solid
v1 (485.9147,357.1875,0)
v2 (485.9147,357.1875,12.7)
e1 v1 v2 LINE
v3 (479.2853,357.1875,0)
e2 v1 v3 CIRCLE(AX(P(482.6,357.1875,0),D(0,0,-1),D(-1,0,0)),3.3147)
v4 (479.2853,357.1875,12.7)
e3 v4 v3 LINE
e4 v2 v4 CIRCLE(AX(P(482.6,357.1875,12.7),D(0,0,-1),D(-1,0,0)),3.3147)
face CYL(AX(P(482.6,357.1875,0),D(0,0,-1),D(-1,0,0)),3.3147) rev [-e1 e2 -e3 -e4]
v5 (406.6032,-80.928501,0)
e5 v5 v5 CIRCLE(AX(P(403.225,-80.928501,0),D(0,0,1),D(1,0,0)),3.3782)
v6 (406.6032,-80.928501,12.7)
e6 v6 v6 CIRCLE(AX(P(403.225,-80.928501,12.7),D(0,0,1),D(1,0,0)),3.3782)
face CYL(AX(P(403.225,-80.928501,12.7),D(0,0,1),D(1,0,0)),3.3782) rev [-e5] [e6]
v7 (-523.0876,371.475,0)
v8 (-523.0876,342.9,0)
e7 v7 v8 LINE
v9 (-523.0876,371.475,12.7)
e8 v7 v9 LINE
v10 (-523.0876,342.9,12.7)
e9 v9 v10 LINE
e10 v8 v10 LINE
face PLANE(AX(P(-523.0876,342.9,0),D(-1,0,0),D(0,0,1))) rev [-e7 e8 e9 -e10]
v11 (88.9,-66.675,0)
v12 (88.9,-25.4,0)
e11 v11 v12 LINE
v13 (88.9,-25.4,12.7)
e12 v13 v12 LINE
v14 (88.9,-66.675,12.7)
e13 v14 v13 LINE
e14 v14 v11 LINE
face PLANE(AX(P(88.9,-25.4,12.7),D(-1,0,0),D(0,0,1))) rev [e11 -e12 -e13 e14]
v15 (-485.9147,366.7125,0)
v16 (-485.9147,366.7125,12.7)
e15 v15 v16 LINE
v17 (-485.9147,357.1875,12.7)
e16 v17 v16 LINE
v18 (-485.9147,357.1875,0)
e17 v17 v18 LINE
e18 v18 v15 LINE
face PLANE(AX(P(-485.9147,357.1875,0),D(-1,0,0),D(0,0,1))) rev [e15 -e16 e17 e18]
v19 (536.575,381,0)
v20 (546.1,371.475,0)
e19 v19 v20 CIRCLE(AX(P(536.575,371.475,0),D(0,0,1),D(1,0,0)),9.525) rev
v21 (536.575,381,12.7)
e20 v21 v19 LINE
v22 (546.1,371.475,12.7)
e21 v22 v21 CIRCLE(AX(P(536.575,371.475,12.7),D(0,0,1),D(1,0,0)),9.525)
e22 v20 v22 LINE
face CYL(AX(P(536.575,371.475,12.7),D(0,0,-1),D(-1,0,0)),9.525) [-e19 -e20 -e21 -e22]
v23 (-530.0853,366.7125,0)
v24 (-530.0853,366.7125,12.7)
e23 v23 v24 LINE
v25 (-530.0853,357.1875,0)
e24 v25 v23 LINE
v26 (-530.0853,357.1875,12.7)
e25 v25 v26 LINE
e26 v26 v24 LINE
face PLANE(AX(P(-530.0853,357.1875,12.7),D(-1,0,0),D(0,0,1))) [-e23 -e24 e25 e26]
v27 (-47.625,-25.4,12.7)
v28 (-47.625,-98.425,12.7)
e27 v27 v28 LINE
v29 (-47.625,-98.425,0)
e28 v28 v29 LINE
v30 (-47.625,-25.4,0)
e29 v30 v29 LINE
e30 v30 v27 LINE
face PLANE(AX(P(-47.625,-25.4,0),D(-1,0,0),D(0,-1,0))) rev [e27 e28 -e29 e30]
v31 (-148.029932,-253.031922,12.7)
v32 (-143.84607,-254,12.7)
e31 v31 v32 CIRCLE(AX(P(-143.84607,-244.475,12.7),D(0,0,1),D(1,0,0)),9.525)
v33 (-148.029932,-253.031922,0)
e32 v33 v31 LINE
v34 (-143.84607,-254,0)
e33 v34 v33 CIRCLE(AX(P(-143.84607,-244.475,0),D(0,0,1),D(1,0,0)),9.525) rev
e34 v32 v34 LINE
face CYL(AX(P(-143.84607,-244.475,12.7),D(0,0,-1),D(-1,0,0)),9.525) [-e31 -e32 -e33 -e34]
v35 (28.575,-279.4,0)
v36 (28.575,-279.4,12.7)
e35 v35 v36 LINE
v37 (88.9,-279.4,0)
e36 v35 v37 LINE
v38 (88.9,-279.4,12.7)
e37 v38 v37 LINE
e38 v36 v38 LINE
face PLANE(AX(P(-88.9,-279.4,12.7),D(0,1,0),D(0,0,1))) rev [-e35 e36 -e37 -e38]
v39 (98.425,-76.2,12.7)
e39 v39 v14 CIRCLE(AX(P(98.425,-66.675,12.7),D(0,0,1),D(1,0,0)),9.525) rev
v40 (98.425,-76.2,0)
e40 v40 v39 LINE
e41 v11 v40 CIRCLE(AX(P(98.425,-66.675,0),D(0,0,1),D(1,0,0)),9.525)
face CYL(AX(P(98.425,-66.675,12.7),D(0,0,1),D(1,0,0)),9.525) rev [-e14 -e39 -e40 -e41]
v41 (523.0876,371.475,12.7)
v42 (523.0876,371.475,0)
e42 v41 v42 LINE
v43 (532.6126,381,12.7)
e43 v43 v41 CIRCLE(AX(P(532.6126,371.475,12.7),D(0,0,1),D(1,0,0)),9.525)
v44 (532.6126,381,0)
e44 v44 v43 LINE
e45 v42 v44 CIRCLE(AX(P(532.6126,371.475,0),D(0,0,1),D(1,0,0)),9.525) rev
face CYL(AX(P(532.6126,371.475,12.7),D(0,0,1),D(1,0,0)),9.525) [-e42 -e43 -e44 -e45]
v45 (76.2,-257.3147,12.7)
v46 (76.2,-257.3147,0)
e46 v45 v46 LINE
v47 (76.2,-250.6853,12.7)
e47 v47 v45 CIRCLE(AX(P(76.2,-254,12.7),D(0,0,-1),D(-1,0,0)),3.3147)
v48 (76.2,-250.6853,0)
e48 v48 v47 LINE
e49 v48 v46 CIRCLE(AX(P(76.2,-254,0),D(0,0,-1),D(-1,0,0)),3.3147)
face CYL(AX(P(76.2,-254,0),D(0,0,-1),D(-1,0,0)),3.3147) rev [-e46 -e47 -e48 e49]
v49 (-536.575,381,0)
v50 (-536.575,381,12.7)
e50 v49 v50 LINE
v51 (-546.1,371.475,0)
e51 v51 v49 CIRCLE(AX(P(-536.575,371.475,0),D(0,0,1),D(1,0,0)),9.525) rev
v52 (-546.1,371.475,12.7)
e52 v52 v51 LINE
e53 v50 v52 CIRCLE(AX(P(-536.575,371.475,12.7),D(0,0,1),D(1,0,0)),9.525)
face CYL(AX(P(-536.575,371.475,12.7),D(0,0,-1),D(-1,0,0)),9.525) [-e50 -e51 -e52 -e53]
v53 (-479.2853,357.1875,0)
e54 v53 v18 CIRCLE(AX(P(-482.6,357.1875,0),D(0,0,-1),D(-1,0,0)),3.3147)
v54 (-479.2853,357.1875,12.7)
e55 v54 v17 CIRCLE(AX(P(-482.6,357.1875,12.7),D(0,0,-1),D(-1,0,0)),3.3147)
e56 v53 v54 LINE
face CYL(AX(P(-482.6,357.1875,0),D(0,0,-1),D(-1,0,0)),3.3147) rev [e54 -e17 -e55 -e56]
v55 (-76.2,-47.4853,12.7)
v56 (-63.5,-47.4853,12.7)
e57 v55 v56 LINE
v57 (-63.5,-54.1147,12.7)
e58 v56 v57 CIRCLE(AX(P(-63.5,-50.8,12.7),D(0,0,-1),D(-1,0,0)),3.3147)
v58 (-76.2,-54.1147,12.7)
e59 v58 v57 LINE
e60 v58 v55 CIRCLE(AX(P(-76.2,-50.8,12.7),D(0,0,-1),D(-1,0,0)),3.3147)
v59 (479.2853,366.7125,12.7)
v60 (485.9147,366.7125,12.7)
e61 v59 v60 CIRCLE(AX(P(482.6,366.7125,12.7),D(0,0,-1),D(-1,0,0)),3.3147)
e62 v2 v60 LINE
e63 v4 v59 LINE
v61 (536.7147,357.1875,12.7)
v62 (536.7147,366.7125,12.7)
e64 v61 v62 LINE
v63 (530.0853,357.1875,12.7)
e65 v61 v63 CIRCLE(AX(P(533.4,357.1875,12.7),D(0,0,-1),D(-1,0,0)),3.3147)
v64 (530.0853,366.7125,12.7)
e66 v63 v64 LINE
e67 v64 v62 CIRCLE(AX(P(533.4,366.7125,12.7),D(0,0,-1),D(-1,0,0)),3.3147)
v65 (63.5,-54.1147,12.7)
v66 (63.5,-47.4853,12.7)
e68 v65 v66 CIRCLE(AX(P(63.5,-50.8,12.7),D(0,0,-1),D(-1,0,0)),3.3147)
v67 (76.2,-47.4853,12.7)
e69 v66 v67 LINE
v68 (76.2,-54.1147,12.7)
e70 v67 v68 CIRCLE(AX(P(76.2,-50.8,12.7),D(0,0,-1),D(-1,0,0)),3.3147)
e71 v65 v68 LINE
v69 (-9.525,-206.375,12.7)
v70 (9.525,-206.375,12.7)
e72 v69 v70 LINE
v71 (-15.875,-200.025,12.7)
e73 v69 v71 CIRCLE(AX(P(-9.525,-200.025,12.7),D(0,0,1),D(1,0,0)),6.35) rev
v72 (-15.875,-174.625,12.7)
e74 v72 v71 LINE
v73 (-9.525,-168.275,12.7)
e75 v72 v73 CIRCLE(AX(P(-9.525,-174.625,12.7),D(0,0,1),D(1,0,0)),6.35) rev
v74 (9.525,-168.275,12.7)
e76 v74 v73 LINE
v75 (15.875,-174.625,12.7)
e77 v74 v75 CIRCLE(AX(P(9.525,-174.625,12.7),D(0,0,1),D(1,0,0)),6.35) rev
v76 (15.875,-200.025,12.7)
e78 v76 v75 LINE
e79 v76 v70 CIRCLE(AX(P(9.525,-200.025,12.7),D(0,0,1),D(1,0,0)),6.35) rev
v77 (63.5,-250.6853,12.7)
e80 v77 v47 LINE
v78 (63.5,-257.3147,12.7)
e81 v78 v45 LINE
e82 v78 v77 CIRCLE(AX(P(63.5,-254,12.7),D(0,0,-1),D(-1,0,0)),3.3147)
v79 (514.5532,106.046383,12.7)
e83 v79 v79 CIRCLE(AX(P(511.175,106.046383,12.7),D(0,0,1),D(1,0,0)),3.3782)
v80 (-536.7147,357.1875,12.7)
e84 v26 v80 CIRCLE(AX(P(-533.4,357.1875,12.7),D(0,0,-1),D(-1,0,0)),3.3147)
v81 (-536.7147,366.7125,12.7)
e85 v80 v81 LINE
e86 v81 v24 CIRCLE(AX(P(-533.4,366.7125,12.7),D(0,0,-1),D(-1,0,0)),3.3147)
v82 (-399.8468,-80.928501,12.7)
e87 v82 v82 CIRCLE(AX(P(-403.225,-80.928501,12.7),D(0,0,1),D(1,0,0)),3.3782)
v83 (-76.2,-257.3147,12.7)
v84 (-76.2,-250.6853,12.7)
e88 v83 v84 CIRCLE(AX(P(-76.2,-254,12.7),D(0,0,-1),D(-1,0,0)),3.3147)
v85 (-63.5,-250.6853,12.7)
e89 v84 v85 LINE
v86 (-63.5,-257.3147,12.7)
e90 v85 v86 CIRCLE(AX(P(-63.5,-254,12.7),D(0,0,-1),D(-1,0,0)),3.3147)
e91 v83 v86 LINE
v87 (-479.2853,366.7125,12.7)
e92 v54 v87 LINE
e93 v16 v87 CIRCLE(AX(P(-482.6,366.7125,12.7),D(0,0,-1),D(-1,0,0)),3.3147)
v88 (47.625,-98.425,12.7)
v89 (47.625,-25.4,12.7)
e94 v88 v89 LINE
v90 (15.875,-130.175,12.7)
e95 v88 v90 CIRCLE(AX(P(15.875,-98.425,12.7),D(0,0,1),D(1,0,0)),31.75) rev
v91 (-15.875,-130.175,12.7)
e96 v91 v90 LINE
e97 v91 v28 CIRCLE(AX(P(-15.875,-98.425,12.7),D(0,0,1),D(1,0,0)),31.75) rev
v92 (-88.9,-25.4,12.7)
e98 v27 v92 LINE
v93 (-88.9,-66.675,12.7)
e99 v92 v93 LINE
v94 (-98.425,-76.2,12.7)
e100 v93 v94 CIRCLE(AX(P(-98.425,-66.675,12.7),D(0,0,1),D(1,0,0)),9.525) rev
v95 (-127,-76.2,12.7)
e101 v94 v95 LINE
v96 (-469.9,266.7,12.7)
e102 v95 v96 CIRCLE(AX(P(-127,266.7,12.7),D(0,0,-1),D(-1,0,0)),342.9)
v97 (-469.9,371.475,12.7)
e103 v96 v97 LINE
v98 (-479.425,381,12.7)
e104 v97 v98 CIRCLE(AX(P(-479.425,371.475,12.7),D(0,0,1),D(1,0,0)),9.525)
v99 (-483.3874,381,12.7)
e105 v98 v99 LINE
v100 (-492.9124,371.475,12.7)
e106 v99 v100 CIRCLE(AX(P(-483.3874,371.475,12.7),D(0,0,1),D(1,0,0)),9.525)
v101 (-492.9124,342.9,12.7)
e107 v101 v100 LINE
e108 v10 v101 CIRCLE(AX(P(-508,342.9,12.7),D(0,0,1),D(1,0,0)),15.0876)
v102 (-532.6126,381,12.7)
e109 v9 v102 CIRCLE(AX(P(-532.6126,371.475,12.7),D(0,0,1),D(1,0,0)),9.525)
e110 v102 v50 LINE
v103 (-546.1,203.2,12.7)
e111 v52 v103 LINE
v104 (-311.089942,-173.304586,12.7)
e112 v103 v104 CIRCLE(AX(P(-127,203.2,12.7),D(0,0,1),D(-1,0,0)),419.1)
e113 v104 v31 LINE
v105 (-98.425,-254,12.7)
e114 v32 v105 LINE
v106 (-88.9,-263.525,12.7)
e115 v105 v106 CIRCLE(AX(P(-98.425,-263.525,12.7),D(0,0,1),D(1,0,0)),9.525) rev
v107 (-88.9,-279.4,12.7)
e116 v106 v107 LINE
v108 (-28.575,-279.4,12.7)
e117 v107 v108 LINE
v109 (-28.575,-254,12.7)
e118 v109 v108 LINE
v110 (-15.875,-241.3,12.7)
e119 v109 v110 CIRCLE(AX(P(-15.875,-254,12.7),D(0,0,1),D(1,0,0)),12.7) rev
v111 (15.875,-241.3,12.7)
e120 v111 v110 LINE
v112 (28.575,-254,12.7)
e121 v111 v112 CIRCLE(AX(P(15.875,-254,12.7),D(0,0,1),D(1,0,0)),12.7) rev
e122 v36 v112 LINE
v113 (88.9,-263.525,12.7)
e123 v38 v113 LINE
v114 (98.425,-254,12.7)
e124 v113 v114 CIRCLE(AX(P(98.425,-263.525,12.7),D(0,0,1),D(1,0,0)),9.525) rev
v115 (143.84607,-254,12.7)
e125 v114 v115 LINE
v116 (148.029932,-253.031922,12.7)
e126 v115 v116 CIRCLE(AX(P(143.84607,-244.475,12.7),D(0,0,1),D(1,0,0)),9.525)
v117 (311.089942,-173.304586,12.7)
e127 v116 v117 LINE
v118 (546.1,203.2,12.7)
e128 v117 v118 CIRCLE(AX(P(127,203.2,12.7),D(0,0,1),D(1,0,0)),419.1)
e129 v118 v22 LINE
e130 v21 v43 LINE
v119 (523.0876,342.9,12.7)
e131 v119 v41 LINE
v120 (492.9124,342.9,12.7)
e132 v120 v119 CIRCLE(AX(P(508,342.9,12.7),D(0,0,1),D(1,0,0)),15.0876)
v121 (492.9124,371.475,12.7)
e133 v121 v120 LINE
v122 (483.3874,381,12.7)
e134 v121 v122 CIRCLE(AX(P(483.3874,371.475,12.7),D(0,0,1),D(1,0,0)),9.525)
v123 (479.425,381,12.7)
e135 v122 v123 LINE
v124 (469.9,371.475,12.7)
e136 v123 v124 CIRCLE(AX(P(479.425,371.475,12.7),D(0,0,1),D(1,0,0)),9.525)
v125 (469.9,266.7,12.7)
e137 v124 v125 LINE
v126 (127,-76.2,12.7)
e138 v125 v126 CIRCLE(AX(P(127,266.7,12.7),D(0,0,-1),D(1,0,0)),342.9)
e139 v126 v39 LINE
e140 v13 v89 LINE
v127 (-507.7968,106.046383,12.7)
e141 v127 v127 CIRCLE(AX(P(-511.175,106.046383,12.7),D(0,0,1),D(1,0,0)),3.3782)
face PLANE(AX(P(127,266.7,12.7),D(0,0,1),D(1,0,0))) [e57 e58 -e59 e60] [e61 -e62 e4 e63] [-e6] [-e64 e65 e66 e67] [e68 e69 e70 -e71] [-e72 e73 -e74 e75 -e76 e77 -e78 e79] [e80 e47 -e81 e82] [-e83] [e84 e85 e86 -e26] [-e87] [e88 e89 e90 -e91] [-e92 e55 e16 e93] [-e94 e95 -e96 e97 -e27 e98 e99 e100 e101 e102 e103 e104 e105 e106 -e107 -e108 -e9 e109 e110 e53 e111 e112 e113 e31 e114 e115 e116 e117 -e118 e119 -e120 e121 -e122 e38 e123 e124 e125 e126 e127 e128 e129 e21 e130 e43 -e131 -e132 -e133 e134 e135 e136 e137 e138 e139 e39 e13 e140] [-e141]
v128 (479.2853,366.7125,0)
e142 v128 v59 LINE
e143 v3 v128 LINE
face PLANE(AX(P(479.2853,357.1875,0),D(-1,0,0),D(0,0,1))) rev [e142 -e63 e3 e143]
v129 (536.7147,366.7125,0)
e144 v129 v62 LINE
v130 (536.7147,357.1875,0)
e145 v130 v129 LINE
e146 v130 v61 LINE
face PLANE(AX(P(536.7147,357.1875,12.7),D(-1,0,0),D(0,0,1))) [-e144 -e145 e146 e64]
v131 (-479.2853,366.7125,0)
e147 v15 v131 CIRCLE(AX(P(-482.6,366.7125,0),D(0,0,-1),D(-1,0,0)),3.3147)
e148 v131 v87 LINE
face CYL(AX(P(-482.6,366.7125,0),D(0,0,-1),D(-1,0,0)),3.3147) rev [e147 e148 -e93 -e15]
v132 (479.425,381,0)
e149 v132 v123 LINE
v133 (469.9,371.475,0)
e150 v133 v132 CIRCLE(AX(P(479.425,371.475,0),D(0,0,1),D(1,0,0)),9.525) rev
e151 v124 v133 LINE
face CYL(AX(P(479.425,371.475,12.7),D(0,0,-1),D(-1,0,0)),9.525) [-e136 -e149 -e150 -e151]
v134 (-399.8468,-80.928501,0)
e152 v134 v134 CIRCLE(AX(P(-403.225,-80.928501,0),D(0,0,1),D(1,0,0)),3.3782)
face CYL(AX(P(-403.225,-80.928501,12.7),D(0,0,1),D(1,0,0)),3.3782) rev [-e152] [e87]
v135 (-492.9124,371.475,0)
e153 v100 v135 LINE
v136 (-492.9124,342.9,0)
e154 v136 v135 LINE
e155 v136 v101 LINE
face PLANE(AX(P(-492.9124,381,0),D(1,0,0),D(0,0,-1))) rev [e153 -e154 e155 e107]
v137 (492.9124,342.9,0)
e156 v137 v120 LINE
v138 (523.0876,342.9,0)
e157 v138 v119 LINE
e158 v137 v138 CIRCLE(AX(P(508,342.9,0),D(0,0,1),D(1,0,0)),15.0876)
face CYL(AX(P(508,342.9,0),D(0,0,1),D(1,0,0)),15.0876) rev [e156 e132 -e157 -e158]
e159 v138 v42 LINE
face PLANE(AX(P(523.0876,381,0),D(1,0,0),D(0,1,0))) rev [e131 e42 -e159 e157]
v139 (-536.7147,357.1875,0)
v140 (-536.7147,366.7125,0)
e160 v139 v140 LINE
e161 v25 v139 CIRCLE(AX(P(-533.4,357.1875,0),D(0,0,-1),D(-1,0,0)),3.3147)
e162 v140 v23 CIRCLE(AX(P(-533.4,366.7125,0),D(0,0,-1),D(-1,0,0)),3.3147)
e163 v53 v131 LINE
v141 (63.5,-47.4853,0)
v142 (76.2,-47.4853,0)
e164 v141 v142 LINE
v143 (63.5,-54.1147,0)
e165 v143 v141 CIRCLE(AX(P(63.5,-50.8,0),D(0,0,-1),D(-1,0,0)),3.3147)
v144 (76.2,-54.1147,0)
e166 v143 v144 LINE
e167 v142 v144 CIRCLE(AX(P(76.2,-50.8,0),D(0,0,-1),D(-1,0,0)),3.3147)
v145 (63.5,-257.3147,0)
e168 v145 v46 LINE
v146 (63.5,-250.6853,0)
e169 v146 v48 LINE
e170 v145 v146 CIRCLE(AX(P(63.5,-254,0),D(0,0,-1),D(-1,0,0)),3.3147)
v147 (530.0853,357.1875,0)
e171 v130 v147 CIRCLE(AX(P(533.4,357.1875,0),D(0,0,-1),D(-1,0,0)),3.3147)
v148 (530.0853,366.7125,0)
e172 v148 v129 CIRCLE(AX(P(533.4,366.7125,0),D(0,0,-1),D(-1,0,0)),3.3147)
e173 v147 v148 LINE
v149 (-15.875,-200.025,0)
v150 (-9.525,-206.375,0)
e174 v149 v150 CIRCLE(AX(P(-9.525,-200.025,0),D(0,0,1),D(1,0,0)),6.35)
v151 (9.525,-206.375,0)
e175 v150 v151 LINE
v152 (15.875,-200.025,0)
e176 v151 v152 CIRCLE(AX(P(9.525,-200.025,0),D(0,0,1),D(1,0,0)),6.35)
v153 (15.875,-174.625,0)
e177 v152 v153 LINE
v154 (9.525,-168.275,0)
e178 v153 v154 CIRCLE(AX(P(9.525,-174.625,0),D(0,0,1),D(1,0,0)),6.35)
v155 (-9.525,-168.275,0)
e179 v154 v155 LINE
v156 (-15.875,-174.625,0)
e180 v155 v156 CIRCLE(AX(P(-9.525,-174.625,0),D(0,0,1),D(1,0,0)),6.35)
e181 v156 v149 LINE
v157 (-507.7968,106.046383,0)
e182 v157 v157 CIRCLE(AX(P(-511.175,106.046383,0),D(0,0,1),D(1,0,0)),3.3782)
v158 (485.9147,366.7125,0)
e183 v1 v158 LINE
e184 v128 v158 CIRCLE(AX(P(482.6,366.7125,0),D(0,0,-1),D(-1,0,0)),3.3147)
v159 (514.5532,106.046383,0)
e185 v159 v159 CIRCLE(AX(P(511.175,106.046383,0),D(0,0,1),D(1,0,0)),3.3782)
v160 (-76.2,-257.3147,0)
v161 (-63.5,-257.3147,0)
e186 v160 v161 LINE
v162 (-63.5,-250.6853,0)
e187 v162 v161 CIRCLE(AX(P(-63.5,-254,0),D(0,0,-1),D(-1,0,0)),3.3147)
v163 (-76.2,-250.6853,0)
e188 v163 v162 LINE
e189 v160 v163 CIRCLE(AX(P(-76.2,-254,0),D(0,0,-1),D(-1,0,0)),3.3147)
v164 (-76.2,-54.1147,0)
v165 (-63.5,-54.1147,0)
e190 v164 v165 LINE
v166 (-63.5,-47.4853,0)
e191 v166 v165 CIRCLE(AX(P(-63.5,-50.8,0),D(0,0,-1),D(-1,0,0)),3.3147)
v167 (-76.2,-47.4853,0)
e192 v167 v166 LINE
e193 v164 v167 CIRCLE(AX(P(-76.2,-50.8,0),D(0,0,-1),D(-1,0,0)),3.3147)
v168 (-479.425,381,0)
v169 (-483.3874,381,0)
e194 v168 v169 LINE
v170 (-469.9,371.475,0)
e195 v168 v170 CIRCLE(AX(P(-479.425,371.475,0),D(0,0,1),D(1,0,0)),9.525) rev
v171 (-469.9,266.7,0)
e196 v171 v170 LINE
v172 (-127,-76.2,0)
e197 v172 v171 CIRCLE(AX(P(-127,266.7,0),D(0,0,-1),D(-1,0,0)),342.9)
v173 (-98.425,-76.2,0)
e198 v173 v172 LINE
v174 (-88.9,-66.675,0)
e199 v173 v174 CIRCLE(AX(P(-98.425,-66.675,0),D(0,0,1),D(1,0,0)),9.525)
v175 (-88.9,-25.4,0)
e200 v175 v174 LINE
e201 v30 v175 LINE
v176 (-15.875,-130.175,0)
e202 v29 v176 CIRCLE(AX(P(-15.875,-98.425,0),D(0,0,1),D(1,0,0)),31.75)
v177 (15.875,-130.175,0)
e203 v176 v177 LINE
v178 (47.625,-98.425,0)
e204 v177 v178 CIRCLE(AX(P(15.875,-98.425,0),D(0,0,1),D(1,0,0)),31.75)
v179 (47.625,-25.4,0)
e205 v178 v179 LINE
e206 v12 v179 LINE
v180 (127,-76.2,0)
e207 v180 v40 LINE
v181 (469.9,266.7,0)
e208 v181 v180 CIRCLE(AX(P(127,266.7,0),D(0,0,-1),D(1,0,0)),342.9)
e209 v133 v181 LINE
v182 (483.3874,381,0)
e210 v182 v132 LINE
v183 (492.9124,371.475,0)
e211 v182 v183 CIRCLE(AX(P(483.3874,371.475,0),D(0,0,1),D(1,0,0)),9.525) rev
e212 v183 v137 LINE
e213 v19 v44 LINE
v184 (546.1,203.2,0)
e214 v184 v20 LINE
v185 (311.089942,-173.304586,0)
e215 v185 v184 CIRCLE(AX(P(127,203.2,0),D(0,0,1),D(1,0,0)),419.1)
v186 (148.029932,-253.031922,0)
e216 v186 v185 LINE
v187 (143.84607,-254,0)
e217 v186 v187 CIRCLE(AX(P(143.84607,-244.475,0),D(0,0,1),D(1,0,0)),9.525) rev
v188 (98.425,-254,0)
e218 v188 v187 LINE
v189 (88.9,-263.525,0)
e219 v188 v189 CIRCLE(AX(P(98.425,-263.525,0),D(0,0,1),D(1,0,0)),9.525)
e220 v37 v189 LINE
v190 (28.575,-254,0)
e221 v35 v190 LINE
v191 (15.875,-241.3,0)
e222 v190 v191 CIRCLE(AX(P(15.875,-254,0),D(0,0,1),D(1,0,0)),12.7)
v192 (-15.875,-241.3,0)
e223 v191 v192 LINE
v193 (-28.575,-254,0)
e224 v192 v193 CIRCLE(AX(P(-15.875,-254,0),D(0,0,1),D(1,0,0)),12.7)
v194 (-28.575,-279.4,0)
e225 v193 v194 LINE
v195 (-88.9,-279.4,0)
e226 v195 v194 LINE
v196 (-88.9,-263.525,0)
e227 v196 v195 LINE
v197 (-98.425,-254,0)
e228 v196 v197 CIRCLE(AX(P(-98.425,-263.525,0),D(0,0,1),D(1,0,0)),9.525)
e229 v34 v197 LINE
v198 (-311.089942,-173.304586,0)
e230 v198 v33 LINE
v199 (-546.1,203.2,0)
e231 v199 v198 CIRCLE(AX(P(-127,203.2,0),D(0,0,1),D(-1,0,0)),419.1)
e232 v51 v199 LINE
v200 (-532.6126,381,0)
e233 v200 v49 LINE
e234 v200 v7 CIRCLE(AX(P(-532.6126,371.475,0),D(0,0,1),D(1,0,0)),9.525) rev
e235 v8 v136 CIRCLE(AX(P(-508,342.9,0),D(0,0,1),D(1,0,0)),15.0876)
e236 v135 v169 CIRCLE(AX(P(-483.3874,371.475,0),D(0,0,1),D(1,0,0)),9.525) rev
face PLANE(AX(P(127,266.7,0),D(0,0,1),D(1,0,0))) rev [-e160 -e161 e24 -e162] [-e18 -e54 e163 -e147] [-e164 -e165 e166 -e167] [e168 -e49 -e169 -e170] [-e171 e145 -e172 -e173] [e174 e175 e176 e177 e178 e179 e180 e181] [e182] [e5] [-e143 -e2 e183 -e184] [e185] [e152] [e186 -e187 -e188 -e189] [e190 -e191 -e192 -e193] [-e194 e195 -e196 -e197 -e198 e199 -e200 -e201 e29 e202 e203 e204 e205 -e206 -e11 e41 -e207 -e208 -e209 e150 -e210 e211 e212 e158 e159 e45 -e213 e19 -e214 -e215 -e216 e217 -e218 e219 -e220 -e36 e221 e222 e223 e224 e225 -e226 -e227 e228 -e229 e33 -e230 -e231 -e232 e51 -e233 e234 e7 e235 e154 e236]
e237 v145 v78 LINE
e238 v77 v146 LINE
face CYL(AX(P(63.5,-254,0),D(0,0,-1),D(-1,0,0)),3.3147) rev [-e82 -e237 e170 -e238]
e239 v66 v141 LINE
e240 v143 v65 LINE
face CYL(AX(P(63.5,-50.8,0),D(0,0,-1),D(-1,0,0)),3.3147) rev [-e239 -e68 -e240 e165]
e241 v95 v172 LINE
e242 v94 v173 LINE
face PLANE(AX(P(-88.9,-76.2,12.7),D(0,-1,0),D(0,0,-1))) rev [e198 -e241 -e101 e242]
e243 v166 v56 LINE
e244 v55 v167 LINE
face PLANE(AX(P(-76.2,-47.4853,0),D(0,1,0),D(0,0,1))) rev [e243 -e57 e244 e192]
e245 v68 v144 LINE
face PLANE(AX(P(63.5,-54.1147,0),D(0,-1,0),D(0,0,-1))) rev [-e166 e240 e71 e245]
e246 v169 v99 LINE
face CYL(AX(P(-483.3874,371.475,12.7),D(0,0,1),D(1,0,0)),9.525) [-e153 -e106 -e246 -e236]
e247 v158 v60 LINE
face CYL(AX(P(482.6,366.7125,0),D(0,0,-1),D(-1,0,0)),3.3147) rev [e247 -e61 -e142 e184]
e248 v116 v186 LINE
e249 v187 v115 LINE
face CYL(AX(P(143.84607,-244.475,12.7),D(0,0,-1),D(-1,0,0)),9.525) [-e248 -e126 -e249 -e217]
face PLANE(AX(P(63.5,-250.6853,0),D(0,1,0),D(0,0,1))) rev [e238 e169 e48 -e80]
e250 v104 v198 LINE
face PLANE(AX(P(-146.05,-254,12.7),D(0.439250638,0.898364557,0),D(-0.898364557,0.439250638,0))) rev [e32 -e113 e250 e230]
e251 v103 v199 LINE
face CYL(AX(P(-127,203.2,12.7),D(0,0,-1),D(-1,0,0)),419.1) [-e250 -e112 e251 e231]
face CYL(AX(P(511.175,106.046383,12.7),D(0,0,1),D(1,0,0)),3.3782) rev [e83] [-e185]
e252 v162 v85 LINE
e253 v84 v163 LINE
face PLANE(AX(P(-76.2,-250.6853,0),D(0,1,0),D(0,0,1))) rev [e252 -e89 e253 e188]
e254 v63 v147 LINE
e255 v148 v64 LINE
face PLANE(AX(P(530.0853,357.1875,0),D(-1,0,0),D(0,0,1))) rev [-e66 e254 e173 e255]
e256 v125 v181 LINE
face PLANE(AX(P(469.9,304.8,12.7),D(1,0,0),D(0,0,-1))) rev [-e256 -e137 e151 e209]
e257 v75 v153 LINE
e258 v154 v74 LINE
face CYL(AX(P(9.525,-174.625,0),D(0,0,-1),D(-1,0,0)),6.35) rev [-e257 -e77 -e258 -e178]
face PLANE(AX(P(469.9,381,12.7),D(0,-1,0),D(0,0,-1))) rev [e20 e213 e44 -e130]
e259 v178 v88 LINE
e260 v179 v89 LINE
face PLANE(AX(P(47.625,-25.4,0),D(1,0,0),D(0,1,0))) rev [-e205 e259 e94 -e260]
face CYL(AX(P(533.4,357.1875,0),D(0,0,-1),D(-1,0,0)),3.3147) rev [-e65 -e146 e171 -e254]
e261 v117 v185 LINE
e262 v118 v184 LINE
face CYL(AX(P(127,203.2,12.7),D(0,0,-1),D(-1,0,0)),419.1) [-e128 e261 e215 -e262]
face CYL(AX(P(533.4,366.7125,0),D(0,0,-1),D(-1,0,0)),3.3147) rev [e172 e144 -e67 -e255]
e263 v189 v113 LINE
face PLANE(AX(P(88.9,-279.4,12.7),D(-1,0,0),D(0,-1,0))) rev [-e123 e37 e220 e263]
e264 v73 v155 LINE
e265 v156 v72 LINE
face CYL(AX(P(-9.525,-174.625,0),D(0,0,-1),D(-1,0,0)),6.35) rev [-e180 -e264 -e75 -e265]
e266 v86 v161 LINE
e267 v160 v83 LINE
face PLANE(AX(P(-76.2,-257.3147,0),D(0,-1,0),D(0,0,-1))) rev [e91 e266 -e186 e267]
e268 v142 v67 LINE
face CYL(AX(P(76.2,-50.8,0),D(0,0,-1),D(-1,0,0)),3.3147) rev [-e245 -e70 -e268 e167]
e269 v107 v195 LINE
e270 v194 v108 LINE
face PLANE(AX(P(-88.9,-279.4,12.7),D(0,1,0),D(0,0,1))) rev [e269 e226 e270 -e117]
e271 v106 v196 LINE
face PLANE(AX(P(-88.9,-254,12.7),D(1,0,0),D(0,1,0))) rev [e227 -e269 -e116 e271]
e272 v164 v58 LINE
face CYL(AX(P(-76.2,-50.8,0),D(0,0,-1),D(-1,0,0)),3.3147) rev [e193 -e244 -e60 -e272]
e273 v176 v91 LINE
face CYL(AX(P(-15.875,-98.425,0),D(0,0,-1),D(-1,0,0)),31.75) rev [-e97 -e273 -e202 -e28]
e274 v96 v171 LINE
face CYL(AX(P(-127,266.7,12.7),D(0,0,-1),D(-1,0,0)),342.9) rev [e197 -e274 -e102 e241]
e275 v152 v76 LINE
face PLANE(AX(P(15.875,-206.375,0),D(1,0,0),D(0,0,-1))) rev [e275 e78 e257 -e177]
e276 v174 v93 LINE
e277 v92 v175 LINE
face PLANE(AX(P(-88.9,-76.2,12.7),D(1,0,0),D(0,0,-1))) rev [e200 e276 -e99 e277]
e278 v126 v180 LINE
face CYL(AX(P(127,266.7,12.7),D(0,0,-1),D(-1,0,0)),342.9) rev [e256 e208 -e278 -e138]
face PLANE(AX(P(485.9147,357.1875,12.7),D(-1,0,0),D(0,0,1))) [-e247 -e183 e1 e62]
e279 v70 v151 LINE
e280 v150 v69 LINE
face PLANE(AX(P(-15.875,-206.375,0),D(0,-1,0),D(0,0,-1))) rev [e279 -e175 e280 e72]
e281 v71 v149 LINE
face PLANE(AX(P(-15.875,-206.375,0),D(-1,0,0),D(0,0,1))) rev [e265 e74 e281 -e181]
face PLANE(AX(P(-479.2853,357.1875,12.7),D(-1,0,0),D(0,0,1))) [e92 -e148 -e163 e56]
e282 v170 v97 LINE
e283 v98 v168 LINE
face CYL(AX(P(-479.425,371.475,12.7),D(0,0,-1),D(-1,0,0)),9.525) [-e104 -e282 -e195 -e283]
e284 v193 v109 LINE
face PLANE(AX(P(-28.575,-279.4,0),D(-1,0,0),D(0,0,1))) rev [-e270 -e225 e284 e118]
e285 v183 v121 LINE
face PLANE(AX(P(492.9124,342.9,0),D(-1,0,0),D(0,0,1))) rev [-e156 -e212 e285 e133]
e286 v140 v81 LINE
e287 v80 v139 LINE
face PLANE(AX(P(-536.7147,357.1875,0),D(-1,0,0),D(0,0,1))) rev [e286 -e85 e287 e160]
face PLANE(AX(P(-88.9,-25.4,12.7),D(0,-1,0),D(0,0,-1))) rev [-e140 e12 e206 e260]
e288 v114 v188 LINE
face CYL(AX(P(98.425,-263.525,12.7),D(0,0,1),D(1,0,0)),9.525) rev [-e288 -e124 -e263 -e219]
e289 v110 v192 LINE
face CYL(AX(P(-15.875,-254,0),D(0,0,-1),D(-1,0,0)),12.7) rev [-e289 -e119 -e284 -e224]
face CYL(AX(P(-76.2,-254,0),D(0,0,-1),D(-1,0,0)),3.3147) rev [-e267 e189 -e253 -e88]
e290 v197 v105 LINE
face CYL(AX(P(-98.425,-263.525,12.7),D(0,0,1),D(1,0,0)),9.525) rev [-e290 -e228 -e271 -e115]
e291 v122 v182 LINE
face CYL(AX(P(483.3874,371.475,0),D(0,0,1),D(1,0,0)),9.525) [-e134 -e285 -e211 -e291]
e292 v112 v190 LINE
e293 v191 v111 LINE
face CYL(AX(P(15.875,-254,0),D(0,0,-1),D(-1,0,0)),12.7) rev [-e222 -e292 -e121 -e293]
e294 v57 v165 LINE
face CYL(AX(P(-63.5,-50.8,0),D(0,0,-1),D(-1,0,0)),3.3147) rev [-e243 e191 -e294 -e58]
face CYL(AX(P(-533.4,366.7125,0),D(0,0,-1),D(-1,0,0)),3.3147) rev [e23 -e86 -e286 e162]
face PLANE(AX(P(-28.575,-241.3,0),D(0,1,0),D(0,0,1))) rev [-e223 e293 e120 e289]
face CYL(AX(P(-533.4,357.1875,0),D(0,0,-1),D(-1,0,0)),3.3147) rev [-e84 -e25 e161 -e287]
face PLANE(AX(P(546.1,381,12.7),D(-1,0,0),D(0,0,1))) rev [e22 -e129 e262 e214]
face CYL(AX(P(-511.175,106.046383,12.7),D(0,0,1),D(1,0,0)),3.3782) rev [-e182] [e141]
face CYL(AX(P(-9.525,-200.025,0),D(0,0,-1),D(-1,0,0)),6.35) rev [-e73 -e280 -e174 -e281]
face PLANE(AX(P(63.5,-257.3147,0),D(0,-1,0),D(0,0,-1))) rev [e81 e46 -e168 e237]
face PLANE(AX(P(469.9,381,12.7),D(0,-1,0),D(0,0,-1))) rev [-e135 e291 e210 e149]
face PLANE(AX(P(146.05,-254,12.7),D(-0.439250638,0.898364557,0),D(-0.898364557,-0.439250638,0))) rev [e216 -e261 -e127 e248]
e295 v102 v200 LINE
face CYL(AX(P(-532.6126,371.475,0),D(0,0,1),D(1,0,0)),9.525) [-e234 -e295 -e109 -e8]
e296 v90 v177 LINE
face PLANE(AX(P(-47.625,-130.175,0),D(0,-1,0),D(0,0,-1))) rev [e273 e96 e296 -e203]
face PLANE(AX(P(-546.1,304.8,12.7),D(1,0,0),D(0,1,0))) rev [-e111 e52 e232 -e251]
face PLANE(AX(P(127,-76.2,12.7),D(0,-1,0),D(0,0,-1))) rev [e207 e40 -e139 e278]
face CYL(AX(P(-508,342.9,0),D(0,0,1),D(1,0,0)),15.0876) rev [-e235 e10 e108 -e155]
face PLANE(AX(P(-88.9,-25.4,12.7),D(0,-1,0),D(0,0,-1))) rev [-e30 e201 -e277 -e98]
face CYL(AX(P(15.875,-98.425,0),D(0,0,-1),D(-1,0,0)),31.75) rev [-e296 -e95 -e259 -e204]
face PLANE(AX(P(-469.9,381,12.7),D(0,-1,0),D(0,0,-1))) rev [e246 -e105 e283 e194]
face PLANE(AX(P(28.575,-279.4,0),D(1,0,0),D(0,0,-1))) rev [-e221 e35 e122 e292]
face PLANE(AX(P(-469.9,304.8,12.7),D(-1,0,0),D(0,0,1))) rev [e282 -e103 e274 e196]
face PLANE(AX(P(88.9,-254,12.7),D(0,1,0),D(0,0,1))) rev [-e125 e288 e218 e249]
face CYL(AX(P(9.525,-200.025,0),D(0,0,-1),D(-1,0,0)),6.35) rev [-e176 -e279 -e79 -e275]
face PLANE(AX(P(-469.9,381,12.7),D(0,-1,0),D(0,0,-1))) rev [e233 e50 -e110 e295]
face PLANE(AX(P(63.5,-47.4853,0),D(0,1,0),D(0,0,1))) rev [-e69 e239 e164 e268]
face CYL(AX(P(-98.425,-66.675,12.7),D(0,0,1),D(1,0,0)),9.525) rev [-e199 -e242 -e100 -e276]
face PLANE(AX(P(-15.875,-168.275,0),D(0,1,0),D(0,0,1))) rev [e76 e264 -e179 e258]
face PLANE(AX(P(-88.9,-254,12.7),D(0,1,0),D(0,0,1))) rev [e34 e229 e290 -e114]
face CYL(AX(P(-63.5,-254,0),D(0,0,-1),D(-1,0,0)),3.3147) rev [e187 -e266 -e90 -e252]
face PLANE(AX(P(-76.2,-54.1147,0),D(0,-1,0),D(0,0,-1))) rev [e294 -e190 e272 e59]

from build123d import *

# Parameters (mm, degrees)
BOSS_EXTRUDE1_DEPTH          = 12.7
CUT_EXTRUDE1_DEPTH           = 666.993618588
G_0_261_DIAMETER_SLOT1_DEPTH = 12.7
G_0_261_DIAMETER_SLOT2_DEPTH = 12.7
FILLET1_R                    = 9.525
SKETCH9_W                    = 57.15
SKETCH9_H                    = 38.1
CUT_EXTRUDE2_DEPTH           = 666.993618588
FILLET3_R                    = 12.7
SKETCH10_W                   = 95.25
SKETCH10_H                   = 104.775
CUT_EXTRUDE3_DEPTH           = 666.993618588
FILLET4_R                    = 31.75
F_1_4_CLEARANCE_HOLE1_D      = 6.7564
SKETCH13_W                   = 31.75
SKETCH13_H                   = 38.1
CUT_EXTRUDE4_DEPTH           = 666.993618588
FILLET5_R                    = 6.35


# Read off the part's stored shape, not the designer's step: G (0.261) Diameter Slot1, G (0.261) Diameter Slot2
with BuildPart() as part:
    # Sketch2 → Boss-Extrude1 (new body)
    with BuildSketch(Plane.XY):
        with BuildLine():
            Line((-88.9, -254), (-88.9, -279.4))
            Line((-88.9, -279.4), (88.9, -279.4))
            Line((88.9, -279.4), (88.9, -254))
            Line((88.9, -254), (146.05, -254))
            Line((146.05, -254), (311.089942486, -173.30458573))
            ThreePointArc((311.089942486, -173.30458573), (482.525600271, -18.715203517), (546.1, 203.2))
            Line((546.1, 203.2), (546.1, 304.8))
            Line((546.1, 304.8), (546.1, 381))
            Line((546.1, 381), (469.9, 381))
            Line((469.9, 381), (469.9, 304.8))
            Line((469.9, 304.8), (469.9, 266.7))
            ThreePointArc((469.9, 266.7), (369.466915269, 24.233084731), (127, -76.2))
            Line((127, -76.2), (88.9, -76.2))
            Line((88.9, -76.2), (88.9, -25.4))
            Line((88.9, -25.4), (-88.9, -25.4))
            Line((-88.9, -25.4), (-88.9, -76.2))
            Line((-88.9, -76.2), (-127, -76.2))
            ThreePointArc((-127, -76.2), (-369.466915269, 24.233084731), (-469.9, 266.7))
            Line((-469.9, 266.7), (-469.9, 304.8))
            Line((-469.9, 304.8), (-469.9, 381))
            Line((-469.9, 381), (-546.1, 381))
            Line((-546.1, 381), (-546.1, 304.8))
            Line((-546.1, 304.8), (-546.1, 203.2))
            ThreePointArc((-546.1, 203.2), (-482.525600271, -18.715203517), (-311.089942486, -173.30458573))
            Line((-311.089942486, -173.30458573), (-146.05, -254))
            Line((-146.05, -254), (-88.9, -254))
        make_face()
    extrude(amount=BOSS_EXTRUDE1_DEPTH)

    # Sketch3 → Cut-Extrude1 (cut, through all)
    with BuildSketch(Plane.XY.offset(12.7)):
        with BuildLine():
            Line((-523.0876, 342.9), (-523.0876, 381))
            Line((-523.0876, 381), (-492.9124, 381))
            Line((-492.9124, 381), (-492.9124, 342.9))
            ThreePointArc((-492.9124, 342.9), (-508, 327.8124), (-523.0876, 342.9))
        make_face()
        with BuildLine():
            Line((492.9124, 342.9), (492.9124, 381))
            Line((492.9124, 381), (523.0876, 381))
            Line((523.0876, 381), (523.0876, 342.9))
            ThreePointArc((523.0876, 342.9), (508, 327.8124), (492.9124, 342.9))
        make_face()
    extrude(amount=-CUT_EXTRUDE1_DEPTH, mode=Mode.SUBTRACT)

    # G (0.261) Diameter Slot1 outline → G (0.261) Diameter Slot1 (cut)
    with BuildSketch(Plane.XY):
        with BuildLine():
            ThreePointArc((-63.5, -257.3147), (-60.1853, -254), (-63.5, -250.6853))
            Line((-63.5, -250.6853), (-76.2, -250.6853))
            ThreePointArc((-76.2, -250.6853), (-79.5147, -254), (-76.2, -257.3147))
            Line((-76.2, -257.3147), (-63.5, -257.3147))
        make_face()
        with BuildLine():
            ThreePointArc((63.5, -250.6853), (60.1853, -254), (63.5, -257.3147))
            Line((63.5, -257.3147), (76.2, -257.3147))
            ThreePointArc((76.2, -257.3147), (79.5147, -254), (76.2, -250.6853))
            Line((76.2, -250.6853), (63.5, -250.6853))
        make_face()
        with BuildLine():
            ThreePointArc((-63.5, -54.1147), (-60.1853, -50.8), (-63.5, -47.4853))
            Line((-63.5, -47.4853), (-76.2, -47.4853))
            ThreePointArc((-76.2, -47.4853), (-79.5147, -50.8), (-76.2, -54.1147))
            Line((-76.2, -54.1147), (-63.5, -54.1147))
        make_face()
        with BuildLine():
            ThreePointArc((63.5, -47.4853), (60.1853, -50.8), (63.5, -54.1147))
            Line((63.5, -54.1147), (76.2, -54.1147))
            ThreePointArc((76.2, -54.1147), (79.5147, -50.8), (76.2, -47.4853))
            Line((76.2, -47.4853), (63.5, -47.4853))
        make_face()
    extrude(amount=G_0_261_DIAMETER_SLOT1_DEPTH, mode=Mode.SUBTRACT)

    # G (0.261) Diameter Slot2 outline → G (0.261) Diameter Slot2 (cut)
    with BuildSketch(Plane.XY):
        with BuildLine():
            ThreePointArc((-479.2853, 366.7125), (-482.6, 370.0272), (-485.9147, 366.7125))
            Line((-485.9147, 366.7125), (-485.9147, 357.1875))
            ThreePointArc((-485.9147, 357.1875), (-482.6, 353.8728), (-479.2853, 357.1875))
            Line((-479.2853, 357.1875), (-479.2853, 366.7125))
        make_face()
        with BuildLine():
            ThreePointArc((-530.0853, 366.7125), (-533.4, 370.0272), (-536.7147, 366.7125))
            Line((-536.7147, 366.7125), (-536.7147, 357.1875))
            ThreePointArc((-536.7147, 357.1875), (-533.4, 353.8728), (-530.0853, 357.1875))
            Line((-530.0853, 357.1875), (-530.0853, 366.7125))
        make_face()
        with BuildLine():
            ThreePointArc((485.9147, 366.7125), (482.6, 370.0272), (479.2853, 366.7125))
            Line((479.2853, 366.7125), (479.2853, 357.1875))
            ThreePointArc((479.2853, 357.1875), (482.6, 353.8728), (485.9147, 357.1875))
            Line((485.9147, 357.1875), (485.9147, 366.7125))
        make_face()
        with BuildLine():
            ThreePointArc((536.7147, 366.7125), (533.4, 370.0272), (530.0853, 366.7125))
            Line((530.0853, 366.7125), (530.0853, 357.1875))
            ThreePointArc((530.0853, 357.1875), (533.4, 353.8728), (536.7147, 357.1875))
            Line((536.7147, 357.1875), (536.7147, 366.7125))
        make_face()
    extrude(amount=G_0_261_DIAMETER_SLOT2_DEPTH, mode=Mode.SUBTRACT)

    # Fillet1
    fillet1_edges = [part.edges().sort_by_distance(p)[0] for p in [
        (469.9, 381, 6.35),
        (546.1, 381, 6.35),
        (146.05, -254, 6.35),
        (88.9, -254, 6.35),
        (-88.9, -254, 6.35),
        (-146.05, -254, 6.35),
        (-546.1, 381, 6.35),
        (-469.9, 381, 6.35),
        (-88.9, -76.2, 6.35),
        (88.9, -76.2, 6.35),
        (492.9124, 381, 6.35),
        (523.0876, 381, 6.35),
        (-523.0876, 381, 6.35),
        (-492.9124, 381, 6.35),
    ]]
    fillet(fillet1_edges, radius=FILLET1_R)

    # Sketch9 → Cut-Extrude2 (cut, through all)
    with BuildSketch(Plane.XY.offset(12.7)):
        with Locations((0, -260.35)):
            Rectangle(SKETCH9_W, SKETCH9_H)
    extrude(amount=-CUT_EXTRUDE2_DEPTH, mode=Mode.SUBTRACT)

    # Fillet3
    fillet3_edges = [part.edges().sort_by_distance(p)[0] for p in [
        (-28.575, -241.3, 6.35),
        (28.575, -241.3, 6.35),
    ]]
    fillet(fillet3_edges, radius=FILLET3_R)

    # Sketch10 → Cut-Extrude3 (cut, through all)
    with BuildSketch(Plane.XY.offset(12.7)):
        with Locations((0, -77.7875)):
            Rectangle(SKETCH10_W, SKETCH10_H)
    extrude(amount=-CUT_EXTRUDE3_DEPTH, mode=Mode.SUBTRACT)

    # Fillet4
    fillet4_edges = [part.edges().sort_by_distance(p)[0] for p in [
        (-47.625, -130.175, 6.35),
        (47.625, -130.175, 6.35),
    ]]
    fillet(fillet4_edges, radius=FILLET4_R)

    # 1/4 Clearance Hole1 (through all)
    with Locations(Plane.XY.offset(12.7)):
        with Locations((403.225, -80.928501225), (511.175, 106.046383452)):
            f_1_4_clearance_hole1 = Hole(F_1_4_CLEARANCE_HOLE1_D / 2)

    # Mirror1: 1/4 Clearance Hole1 across plane
    add(f_1_4_clearance_hole1.mirror(Plane(origin=(0, 0, 0), x_dir=(0, 0, 1), z_dir=(1, 0, 0))), mode=Mode.SUBTRACT)

    # Sketch13 → Cut-Extrude4 (cut, through all)
    with BuildSketch(Plane.XY.offset(12.7)):
        with Locations((0, -187.325)):
            Rectangle(SKETCH13_W, SKETCH13_H)
    extrude(amount=-CUT_EXTRUDE4_DEPTH, mode=Mode.SUBTRACT)

    # Fillet5
    fillet5_edges = [part.edges().sort_by_distance(p)[0] for p in [
        (15.875, -168.275, 6.35),
        (15.875, -206.375, 6.35),
        (-15.875, -206.375, 6.35),
        (-15.875, -168.275, 6.35),
    ]]
    fillet(fillet5_edges, radius=FILLET5_R)


solid = part.part
